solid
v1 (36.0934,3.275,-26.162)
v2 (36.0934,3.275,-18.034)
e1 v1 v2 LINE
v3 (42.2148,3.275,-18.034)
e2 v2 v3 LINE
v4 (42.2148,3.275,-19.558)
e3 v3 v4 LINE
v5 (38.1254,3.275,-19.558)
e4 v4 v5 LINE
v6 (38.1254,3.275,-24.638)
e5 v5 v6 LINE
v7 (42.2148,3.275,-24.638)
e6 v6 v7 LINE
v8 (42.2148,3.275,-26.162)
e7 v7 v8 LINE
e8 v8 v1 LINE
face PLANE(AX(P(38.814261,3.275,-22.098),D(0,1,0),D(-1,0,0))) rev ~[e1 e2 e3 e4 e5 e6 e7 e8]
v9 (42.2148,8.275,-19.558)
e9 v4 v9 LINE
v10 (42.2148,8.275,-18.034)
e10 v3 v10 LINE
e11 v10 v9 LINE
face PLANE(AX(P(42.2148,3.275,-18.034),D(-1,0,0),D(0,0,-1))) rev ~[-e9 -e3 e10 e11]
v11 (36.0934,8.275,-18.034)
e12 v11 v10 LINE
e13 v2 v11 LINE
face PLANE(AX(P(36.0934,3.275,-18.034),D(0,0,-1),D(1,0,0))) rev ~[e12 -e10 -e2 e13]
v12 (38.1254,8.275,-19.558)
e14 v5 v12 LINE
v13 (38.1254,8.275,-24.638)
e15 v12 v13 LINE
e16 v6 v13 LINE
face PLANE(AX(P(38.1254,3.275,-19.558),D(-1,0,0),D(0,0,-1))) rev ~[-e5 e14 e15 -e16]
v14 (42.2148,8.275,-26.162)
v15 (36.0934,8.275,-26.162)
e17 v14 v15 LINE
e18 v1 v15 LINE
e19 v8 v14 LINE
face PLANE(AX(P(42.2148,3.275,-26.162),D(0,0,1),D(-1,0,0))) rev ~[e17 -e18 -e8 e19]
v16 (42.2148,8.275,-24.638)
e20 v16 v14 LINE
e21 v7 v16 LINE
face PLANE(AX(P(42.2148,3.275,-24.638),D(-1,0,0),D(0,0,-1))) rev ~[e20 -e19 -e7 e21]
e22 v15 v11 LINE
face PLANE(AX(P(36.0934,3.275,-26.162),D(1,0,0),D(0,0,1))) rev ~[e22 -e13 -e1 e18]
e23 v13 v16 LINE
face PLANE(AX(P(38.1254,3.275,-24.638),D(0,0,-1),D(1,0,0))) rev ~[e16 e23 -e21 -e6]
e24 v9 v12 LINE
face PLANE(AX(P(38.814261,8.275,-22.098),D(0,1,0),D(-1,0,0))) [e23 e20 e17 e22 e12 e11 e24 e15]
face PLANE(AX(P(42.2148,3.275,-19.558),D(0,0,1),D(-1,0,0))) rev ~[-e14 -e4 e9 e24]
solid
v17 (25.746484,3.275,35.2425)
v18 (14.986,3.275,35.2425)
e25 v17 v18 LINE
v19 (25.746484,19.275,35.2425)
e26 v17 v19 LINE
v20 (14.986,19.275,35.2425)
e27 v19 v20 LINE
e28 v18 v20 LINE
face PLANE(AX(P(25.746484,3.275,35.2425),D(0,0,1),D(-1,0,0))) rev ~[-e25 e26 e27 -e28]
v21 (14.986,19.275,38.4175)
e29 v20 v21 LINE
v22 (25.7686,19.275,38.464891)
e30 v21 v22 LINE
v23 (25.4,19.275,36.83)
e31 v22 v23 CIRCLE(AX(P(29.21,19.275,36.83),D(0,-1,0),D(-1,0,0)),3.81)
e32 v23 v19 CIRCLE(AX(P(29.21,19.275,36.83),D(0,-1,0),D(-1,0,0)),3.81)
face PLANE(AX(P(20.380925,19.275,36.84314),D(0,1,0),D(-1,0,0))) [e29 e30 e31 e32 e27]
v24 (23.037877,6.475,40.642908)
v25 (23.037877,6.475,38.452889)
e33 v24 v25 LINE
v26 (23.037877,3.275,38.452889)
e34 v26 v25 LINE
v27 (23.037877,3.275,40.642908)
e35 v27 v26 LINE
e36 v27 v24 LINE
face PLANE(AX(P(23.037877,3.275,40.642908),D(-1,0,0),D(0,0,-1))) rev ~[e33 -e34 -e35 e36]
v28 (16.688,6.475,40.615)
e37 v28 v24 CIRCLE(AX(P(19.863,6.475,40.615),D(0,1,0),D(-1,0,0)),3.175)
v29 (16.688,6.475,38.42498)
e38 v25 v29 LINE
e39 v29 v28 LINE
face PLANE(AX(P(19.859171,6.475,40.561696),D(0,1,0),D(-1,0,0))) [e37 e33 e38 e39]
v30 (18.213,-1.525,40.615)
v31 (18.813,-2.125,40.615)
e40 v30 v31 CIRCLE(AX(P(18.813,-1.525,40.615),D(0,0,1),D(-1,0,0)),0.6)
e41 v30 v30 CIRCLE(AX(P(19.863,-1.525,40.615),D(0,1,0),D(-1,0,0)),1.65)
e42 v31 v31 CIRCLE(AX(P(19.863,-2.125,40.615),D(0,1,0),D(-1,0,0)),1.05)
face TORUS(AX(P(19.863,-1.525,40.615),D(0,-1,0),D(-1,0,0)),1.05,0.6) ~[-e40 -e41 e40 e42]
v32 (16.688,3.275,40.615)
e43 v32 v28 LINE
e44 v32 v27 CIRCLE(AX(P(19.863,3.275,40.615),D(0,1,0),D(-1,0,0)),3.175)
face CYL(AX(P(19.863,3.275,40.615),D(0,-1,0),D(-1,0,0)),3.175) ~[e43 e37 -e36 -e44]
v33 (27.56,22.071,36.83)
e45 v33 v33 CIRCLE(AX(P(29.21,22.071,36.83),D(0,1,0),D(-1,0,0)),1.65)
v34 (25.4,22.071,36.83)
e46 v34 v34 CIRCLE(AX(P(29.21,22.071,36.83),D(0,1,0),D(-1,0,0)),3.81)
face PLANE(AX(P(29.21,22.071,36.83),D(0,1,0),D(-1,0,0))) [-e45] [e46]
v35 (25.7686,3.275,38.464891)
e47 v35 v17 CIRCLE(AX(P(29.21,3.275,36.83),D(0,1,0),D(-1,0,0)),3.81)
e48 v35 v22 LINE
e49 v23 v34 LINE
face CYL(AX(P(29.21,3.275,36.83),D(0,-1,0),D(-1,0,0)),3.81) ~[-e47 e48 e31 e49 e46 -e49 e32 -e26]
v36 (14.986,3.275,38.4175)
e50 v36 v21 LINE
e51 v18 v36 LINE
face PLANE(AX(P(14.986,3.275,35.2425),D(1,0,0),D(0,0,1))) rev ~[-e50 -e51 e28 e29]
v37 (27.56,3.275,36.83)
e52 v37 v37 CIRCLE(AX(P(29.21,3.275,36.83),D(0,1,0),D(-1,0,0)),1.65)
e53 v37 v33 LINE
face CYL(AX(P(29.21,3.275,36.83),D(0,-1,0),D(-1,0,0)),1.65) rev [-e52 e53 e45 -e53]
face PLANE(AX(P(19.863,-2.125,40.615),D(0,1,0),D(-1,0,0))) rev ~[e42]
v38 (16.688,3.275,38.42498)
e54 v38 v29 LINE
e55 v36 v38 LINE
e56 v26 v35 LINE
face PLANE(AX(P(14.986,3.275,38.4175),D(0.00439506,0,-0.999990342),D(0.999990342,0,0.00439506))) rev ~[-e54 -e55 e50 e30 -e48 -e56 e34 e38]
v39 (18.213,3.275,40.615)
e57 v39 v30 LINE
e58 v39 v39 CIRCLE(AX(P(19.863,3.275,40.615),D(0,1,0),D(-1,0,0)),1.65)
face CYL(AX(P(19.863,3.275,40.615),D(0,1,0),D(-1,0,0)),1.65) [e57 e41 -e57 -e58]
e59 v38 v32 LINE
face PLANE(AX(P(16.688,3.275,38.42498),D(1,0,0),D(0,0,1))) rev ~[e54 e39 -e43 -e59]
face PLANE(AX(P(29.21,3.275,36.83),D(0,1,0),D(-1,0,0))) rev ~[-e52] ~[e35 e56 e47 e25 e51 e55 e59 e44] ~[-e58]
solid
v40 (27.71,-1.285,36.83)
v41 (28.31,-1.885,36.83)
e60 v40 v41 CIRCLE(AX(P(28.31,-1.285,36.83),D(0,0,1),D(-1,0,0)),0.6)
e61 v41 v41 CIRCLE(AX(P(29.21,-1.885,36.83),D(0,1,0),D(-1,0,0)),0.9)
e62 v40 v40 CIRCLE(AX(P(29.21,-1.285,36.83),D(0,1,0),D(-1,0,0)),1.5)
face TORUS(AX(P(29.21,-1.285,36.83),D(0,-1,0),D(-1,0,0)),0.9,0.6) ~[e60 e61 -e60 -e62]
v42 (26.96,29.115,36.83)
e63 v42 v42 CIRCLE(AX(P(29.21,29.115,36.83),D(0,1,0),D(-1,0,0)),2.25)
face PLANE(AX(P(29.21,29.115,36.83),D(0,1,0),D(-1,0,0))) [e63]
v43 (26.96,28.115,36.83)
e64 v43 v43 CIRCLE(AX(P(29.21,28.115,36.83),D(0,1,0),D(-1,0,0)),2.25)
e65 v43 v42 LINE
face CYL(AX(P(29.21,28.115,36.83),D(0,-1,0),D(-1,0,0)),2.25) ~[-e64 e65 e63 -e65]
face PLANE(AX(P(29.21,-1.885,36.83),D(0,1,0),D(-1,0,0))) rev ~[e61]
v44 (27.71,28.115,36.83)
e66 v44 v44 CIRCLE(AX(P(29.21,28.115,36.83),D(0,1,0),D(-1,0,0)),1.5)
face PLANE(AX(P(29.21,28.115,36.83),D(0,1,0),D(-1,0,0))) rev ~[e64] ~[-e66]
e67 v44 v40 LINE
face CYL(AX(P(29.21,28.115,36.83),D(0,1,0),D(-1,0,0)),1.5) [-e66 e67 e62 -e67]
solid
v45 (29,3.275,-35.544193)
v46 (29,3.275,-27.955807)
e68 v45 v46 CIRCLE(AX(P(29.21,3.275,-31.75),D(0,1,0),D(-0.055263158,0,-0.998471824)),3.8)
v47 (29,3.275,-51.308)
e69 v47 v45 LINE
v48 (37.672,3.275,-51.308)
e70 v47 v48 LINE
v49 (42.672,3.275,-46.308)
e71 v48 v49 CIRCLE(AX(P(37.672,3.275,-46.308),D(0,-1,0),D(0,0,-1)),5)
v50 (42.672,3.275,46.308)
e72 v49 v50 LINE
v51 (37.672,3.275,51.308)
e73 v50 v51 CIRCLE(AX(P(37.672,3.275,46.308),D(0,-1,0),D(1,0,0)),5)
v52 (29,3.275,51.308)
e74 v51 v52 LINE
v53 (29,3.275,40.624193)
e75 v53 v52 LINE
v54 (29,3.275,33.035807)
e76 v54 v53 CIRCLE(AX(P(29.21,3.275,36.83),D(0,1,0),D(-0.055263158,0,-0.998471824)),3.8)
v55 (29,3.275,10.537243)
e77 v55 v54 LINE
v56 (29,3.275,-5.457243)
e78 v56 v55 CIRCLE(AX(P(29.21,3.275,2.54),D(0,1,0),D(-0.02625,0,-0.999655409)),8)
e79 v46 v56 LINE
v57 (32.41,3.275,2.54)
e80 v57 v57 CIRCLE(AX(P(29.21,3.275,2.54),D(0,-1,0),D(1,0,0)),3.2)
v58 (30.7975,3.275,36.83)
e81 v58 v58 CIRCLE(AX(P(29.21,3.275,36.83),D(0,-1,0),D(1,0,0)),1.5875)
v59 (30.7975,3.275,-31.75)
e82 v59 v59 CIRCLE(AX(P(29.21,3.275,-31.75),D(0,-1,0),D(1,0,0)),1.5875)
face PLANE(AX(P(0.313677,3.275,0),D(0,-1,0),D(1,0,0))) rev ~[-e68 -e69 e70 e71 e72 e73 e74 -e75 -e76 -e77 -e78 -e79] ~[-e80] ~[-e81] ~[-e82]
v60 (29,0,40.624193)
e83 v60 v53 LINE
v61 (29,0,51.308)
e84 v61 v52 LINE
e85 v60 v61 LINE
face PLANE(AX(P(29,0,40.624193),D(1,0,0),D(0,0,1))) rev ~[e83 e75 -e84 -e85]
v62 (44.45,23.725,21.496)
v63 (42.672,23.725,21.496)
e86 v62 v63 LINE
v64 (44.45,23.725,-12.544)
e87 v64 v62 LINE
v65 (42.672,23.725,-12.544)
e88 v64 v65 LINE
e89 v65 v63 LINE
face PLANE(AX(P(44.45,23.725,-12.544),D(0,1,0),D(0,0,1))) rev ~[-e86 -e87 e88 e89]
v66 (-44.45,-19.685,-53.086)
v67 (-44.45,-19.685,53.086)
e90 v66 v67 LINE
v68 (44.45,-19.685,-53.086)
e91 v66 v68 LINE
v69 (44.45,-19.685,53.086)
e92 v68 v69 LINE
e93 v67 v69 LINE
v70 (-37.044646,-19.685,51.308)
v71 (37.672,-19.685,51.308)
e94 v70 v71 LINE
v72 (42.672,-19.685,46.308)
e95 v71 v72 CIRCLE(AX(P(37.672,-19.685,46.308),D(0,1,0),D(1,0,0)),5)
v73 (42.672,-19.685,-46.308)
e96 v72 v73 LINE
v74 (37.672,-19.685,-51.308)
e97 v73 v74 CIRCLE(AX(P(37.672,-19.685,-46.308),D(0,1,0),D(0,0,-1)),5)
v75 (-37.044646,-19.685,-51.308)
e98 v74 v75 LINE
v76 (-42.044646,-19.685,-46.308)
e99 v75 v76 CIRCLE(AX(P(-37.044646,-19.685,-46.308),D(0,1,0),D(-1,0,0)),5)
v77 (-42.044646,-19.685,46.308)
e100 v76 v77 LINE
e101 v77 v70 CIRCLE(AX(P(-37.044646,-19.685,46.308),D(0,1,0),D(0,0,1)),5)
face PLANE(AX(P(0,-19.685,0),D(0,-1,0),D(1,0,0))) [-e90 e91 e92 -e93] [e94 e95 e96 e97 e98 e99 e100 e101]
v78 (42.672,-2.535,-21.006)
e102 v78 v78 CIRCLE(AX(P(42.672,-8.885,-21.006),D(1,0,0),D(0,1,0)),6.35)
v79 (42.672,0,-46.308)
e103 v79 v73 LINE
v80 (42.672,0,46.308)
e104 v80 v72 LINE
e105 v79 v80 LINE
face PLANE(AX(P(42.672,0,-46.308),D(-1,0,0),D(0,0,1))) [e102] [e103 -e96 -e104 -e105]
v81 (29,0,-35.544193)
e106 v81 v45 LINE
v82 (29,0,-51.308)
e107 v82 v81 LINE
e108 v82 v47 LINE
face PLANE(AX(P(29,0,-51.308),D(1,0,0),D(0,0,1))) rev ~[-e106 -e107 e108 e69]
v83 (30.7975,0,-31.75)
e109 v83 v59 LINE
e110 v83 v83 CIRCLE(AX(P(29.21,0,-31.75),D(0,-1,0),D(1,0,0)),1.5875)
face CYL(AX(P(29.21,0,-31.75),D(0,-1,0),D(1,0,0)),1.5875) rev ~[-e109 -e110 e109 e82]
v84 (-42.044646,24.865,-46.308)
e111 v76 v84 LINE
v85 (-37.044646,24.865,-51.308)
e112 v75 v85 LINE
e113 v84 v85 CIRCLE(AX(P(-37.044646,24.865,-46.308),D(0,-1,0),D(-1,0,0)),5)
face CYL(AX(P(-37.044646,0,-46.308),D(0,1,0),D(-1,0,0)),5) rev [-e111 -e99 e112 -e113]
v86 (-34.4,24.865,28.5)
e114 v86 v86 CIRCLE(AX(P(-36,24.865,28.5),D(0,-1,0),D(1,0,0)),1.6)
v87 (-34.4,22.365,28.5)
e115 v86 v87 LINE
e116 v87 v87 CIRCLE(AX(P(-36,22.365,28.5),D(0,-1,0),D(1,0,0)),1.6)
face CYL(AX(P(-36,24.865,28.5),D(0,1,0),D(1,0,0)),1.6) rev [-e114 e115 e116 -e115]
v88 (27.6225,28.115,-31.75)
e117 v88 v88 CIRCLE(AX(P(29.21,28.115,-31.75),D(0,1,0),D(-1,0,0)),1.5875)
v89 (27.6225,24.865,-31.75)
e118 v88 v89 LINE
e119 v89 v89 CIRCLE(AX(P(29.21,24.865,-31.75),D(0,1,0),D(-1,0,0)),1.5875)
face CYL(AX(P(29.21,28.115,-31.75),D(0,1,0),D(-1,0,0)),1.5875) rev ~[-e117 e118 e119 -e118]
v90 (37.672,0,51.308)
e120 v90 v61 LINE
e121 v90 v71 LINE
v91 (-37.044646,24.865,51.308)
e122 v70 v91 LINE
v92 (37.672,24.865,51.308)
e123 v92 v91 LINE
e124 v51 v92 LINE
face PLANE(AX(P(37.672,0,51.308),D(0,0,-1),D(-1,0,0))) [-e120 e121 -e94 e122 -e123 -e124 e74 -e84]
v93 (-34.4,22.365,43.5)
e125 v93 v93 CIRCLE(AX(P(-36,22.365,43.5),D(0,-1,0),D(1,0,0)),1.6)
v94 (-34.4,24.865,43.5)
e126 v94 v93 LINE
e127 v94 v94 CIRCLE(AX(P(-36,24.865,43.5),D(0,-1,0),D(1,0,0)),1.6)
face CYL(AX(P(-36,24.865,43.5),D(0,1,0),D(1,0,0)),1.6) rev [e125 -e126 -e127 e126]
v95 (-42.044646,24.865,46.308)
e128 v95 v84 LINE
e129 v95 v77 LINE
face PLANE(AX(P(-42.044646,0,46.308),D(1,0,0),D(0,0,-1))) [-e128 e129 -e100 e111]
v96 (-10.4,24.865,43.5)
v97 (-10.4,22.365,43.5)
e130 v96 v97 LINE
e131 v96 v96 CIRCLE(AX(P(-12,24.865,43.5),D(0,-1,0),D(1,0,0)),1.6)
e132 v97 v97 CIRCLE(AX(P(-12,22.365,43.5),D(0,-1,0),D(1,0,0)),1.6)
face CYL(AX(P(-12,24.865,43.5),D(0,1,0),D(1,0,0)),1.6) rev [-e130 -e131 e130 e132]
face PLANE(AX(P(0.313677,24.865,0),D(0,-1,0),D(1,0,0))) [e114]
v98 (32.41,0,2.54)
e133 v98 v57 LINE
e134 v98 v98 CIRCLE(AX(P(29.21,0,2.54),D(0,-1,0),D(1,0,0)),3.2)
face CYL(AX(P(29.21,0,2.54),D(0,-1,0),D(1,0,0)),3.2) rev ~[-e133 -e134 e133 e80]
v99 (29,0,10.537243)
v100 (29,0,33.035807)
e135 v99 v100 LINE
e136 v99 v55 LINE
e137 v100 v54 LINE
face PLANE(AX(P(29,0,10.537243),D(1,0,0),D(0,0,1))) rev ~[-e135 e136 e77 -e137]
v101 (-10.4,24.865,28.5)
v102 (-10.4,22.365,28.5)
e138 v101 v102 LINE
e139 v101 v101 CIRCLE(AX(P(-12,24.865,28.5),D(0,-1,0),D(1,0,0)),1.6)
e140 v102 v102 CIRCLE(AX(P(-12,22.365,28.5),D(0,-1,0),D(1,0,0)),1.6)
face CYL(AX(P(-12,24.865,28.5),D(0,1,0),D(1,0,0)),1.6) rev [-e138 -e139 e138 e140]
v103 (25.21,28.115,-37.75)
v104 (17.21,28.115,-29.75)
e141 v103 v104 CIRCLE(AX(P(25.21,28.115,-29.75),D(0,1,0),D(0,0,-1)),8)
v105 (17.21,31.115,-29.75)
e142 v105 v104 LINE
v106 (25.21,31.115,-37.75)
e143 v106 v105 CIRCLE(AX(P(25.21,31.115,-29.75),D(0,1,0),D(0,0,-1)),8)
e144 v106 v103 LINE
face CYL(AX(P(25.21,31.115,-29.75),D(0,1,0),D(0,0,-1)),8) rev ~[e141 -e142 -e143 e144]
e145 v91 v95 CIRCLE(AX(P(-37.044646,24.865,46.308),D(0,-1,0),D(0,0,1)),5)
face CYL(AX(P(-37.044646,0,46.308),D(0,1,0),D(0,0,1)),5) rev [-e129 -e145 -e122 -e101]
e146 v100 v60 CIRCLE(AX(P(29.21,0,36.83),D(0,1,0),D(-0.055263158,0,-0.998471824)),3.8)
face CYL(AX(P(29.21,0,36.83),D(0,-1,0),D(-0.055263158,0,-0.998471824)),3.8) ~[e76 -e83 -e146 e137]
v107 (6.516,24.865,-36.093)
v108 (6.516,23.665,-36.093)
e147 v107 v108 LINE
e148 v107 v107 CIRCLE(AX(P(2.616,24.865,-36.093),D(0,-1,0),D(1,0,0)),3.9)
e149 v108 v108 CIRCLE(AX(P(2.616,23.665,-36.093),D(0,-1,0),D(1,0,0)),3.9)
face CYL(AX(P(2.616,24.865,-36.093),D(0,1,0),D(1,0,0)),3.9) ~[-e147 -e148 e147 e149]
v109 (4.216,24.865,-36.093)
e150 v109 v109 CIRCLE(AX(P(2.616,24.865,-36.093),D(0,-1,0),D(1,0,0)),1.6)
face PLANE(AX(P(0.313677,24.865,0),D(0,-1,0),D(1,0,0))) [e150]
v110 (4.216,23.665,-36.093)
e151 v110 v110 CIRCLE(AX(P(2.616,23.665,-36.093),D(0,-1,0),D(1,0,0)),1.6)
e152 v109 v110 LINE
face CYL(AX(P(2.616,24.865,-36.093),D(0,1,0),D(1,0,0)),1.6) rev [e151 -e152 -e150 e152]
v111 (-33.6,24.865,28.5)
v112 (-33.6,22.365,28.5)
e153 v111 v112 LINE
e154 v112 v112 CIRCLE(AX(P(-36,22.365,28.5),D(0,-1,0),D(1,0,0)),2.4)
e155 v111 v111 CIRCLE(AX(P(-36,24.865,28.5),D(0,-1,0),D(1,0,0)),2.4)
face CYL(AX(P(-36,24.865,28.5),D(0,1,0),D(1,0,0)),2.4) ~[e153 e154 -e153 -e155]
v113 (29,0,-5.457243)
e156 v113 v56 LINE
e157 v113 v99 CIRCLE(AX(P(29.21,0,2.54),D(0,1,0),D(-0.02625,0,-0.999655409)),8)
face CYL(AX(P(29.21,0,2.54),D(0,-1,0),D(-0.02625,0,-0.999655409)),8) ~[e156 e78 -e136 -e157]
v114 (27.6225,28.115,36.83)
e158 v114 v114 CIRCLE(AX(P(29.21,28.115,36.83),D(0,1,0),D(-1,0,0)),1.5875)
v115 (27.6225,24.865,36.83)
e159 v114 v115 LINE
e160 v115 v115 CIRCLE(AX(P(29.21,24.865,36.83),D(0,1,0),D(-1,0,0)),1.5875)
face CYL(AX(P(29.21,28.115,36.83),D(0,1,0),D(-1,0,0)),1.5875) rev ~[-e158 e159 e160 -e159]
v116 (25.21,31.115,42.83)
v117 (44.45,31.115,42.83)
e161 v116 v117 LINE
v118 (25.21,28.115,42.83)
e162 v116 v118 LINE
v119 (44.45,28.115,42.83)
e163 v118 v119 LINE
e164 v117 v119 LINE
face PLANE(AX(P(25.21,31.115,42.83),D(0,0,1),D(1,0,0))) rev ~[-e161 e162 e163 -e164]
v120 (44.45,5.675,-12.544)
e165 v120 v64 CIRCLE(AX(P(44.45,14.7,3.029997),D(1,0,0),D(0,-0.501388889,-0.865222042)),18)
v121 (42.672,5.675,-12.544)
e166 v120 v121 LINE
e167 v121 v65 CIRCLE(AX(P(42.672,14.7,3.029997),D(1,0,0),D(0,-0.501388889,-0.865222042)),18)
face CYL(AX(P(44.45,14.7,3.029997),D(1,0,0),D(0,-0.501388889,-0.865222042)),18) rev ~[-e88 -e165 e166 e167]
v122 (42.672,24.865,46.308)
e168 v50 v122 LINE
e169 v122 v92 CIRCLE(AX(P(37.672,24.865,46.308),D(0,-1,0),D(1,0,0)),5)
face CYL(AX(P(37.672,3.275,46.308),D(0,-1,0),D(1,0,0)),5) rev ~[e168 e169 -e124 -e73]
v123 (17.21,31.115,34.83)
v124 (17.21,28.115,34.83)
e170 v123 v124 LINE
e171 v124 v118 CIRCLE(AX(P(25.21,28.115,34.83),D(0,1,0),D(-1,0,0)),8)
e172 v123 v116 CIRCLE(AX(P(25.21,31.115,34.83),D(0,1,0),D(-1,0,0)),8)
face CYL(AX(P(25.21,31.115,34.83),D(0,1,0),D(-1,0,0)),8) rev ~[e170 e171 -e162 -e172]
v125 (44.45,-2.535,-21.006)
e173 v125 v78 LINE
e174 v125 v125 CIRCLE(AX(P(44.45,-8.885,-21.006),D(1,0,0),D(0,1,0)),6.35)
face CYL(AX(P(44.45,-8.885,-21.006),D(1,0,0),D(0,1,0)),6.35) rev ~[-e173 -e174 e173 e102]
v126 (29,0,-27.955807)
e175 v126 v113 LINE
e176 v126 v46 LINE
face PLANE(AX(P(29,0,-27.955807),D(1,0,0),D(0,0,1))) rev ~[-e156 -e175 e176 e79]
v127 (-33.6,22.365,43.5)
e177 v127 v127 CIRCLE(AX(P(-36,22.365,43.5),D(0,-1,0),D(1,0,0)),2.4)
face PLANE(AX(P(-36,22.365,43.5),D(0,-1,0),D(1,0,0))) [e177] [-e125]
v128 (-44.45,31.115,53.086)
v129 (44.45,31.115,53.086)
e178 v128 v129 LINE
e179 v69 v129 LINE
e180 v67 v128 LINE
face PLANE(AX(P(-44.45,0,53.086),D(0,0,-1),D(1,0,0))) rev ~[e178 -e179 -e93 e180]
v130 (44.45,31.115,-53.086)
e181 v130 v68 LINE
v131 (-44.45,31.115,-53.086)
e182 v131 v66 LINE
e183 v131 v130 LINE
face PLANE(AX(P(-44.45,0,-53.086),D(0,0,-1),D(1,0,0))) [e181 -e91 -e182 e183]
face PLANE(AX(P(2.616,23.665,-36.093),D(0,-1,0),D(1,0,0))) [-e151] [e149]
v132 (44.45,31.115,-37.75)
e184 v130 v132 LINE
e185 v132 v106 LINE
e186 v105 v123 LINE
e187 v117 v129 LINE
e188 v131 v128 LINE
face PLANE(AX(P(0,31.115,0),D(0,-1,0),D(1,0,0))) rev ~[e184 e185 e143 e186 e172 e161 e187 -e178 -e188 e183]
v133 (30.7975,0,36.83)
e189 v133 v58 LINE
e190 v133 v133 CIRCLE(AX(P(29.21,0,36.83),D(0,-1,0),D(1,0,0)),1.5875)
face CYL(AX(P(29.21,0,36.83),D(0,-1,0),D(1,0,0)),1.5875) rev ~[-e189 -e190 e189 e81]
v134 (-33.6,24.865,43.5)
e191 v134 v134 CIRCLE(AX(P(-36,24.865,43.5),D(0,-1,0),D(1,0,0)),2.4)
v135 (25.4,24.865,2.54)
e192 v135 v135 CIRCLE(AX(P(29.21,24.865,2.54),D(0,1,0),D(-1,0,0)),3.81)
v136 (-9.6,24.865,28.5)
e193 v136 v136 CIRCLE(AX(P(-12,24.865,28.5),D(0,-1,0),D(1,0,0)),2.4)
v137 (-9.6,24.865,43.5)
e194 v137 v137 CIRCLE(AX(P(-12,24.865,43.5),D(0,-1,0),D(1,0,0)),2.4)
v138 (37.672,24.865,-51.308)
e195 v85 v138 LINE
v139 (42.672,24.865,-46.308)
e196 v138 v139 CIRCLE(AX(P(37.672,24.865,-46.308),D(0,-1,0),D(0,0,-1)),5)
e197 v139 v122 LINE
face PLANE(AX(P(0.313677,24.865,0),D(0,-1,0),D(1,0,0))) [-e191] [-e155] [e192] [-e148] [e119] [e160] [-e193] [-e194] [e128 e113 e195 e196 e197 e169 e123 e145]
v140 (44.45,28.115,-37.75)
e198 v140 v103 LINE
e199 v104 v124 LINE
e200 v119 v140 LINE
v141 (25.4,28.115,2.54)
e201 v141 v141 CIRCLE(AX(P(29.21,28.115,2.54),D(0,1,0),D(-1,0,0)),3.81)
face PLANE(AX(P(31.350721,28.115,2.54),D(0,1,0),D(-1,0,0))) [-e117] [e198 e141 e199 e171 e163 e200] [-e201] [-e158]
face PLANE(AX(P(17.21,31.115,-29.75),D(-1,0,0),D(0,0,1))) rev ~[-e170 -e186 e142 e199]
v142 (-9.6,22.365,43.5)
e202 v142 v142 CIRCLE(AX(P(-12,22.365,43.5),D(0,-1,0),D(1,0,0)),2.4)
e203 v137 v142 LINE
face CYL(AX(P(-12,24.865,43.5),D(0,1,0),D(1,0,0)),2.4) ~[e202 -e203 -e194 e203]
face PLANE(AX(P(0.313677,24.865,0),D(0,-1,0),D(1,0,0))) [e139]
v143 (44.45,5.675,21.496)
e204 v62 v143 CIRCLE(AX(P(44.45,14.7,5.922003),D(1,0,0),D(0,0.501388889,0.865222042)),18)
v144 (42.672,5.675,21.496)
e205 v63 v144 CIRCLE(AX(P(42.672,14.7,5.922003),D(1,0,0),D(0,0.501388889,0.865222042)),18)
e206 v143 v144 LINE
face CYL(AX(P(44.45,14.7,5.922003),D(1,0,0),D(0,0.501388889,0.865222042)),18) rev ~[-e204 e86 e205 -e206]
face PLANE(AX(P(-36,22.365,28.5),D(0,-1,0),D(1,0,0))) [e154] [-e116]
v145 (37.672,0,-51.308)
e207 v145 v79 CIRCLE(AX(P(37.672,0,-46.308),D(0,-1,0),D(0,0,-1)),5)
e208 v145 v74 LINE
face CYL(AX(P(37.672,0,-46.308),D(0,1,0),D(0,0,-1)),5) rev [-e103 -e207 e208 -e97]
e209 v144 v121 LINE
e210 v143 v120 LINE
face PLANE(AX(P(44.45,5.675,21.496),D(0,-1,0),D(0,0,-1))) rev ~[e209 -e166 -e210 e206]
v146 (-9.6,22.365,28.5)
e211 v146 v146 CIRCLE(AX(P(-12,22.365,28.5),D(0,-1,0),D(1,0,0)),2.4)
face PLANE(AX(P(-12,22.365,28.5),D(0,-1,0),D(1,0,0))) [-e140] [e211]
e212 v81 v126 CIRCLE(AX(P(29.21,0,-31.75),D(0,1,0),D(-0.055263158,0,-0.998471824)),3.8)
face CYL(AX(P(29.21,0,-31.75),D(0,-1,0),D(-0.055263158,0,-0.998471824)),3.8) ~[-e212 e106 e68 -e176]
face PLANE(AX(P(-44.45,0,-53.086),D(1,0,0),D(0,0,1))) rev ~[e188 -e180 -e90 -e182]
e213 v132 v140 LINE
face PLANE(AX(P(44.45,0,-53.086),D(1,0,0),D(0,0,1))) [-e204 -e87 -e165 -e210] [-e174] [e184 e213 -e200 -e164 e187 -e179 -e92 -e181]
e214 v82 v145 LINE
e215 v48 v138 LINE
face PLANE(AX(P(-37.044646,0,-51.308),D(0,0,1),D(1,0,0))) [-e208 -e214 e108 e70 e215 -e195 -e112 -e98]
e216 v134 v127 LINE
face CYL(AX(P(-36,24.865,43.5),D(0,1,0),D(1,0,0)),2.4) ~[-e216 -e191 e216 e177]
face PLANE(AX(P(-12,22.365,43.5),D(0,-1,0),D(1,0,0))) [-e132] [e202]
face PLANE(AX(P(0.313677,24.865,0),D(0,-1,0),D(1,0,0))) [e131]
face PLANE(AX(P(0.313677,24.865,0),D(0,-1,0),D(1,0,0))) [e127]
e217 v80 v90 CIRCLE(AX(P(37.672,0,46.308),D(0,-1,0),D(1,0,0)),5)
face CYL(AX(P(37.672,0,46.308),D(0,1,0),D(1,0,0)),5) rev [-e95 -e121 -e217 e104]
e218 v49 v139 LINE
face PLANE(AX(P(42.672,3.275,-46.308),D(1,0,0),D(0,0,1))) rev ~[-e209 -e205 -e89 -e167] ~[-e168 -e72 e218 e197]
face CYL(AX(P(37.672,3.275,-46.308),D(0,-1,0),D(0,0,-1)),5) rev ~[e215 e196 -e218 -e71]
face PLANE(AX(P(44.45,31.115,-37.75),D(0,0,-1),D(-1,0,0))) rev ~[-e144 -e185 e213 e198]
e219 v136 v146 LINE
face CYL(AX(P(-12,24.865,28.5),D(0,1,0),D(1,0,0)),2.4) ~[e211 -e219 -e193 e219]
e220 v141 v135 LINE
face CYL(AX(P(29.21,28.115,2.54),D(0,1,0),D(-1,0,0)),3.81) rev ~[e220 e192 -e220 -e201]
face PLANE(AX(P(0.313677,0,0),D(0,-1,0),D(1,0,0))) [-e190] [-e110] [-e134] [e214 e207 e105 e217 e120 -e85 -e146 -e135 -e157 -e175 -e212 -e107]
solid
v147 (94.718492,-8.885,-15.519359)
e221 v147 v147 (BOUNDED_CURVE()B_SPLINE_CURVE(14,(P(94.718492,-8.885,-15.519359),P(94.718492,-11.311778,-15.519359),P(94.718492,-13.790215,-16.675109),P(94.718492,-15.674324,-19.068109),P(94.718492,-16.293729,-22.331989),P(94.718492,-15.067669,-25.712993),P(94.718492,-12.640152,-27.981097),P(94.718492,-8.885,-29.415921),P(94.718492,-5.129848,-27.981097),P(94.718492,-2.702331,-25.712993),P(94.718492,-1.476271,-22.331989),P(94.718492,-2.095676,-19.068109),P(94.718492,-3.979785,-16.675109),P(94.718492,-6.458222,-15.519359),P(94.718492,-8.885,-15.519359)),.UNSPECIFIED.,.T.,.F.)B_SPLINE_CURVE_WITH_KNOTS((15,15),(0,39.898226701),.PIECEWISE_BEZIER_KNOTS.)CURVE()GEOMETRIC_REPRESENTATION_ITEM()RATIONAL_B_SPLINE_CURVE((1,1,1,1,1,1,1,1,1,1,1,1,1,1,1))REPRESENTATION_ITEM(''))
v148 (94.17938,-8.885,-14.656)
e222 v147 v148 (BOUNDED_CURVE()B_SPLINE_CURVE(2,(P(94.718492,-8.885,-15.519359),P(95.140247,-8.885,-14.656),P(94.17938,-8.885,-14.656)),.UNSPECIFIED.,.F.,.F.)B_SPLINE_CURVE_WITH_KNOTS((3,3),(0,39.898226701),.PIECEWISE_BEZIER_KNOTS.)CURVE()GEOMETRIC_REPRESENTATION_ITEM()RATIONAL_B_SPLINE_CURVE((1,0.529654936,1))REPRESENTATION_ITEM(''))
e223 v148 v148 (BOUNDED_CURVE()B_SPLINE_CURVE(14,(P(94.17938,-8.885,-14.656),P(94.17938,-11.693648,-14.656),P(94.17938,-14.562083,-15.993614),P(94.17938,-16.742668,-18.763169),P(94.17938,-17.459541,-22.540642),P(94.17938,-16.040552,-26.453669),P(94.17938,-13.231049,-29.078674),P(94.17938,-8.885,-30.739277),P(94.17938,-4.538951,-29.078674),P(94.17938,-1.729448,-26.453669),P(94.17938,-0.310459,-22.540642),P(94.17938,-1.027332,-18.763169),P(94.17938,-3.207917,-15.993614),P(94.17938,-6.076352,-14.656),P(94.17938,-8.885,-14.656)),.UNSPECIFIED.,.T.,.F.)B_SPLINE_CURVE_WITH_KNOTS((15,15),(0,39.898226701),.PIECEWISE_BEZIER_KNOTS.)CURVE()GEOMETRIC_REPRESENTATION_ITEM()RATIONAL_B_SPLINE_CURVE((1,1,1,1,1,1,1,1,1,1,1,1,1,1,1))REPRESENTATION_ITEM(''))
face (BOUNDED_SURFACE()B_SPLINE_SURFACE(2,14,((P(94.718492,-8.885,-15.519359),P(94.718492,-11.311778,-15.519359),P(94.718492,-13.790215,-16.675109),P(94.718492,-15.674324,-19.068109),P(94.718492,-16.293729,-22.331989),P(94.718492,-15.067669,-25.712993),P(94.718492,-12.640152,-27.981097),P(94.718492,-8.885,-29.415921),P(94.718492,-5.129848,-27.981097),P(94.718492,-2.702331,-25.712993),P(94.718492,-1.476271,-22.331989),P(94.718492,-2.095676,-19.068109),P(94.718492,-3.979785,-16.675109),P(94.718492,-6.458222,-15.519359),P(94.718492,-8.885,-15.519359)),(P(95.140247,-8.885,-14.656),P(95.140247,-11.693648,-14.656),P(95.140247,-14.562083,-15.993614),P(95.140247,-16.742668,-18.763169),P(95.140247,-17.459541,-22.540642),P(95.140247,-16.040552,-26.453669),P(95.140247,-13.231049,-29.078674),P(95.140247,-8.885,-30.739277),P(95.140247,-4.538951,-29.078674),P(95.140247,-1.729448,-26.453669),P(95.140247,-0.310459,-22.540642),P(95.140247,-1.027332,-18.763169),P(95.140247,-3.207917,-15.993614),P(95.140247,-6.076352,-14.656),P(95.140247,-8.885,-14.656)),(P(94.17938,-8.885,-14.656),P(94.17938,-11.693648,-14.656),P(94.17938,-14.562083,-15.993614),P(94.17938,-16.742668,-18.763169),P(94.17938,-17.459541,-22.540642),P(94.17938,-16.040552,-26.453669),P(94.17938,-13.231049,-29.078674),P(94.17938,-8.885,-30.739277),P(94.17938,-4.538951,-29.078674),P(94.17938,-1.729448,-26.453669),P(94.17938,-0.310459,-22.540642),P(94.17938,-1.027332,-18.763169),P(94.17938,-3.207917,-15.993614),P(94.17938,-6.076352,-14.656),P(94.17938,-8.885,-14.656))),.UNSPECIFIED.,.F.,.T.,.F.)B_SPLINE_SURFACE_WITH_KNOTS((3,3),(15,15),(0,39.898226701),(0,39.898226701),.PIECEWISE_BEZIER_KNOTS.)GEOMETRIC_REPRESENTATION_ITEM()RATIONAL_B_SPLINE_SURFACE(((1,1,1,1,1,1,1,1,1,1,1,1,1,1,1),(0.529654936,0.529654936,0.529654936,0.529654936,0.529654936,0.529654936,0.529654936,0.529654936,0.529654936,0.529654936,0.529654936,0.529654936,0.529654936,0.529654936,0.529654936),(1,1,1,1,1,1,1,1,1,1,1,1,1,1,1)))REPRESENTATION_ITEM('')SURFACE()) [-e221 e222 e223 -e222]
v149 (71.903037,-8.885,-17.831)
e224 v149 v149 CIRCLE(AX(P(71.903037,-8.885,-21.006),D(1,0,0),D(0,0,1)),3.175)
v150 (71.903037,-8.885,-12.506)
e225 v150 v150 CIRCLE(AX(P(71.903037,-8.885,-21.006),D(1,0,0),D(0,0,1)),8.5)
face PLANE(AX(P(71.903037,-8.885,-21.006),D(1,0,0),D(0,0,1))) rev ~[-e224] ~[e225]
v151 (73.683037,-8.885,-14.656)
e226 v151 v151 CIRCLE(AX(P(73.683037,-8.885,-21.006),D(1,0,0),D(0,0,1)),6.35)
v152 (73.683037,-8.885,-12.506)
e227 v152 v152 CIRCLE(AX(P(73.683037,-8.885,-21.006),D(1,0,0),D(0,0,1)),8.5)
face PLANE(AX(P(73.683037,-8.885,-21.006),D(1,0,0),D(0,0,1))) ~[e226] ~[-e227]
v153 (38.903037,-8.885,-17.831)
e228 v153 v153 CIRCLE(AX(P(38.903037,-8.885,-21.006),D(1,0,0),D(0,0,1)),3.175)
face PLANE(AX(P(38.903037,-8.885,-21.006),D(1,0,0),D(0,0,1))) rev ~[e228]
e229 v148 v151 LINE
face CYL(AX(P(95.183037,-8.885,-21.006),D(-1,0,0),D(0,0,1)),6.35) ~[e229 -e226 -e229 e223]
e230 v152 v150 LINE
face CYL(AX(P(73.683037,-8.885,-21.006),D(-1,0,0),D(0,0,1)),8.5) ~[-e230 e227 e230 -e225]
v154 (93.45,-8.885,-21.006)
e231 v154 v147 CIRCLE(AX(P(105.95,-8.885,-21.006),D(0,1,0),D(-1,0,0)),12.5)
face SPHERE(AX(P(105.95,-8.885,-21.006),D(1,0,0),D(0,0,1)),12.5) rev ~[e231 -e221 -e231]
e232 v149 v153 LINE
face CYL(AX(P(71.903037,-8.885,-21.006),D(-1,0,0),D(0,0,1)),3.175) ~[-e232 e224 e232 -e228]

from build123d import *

# Parameters (mm, degrees)
F1_W      = 88.9
F1_H      = 106.172
F2_DEPTH  = 19.685
F3_W      = 88.9
F3_H      = 106.172
F4_DEPTH  = 31.115
F6_DEPTH  = 19.686
F8_R      = 6.35
F9_DEPTH  = 1.778
F12_DEPTH = 21.59
F13_R     = 1.5875
F13_R_2   = 3.2
F14_DEPTH = 3.275
F17_DEPTH = 2
F19_DEPTH = 3
F20_R     = 3.81
F20_R_2   = 1.5875
F21_DEPTH = 4
F24_R     = 0.6
F26_R     = 3.81
F26_R_2   = 1.65
F27_DEPTH = 18.796
F29_DEPTH = 16
F31_DEPTH = 3.2
F32_R     = 1.65
F33_DEPTH = 5.4
F34_R     = 0.6
F35_R     = 3.9
F35_R_2   = 1.6
F36_DEPTH = 1.2
F38_DEPTH = 5
F39_R     = 1.5
F40_DEPTH = 30
F41_R     = 0.6
F42_R     = 2.25
F43_DEPTH = 1
F44_R     = 2.4
F44_R_2   = 1.6
F45_DEPTH = 2.5


with BuildPart() as f2:
    # F1 (on Front) → F2 (new body)
    with BuildSketch(Plane.XZ):
        Rectangle(F1_W, F1_H)
    extrude(amount=F2_DEPTH)

    # F3 (on Front) → F4 (join)
    with BuildSketch(Plane.XZ):
        Rectangle(F3_W, F3_H)
    extrude(amount=-F4_DEPTH)

    # F5 (on Front) → F6 (cut, through all)
    with BuildSketch(Plane.XZ):
        with BuildLine():
            ThreePointArc((-37.044646, 51.308), (-40.5801799059, 49.8435339059), (-42.044646, 46.308))
            Line((-42.044646, 46.308), (-42.044646, -46.308))
            ThreePointArc((-42.044646, -46.308), (-40.5801799059, -49.8435339059), (-37.044646, -51.308))
            Line((-37.044646, -51.308), (37.672, -51.308))
            ThreePointArc((37.672, -51.308), (41.2075339059, -49.8435339059), (42.672, -46.308))
            Line((42.672, -46.308), (42.672, 46.308))
            ThreePointArc((42.672, 46.308), (41.2075339059, 49.8435339059), (37.672, 51.308))
            Line((37.672, 51.308), (-37.044646, 51.308))
        make_face()
    extrude(amount=F6_DEPTH, mode=Mode.SUBTRACT)

    # F8 (on face) → F9 (cut, through all)
    with BuildSketch(Plane.YZ.offset(44.45)):
        with Locations((-8.885, -21.006)):
            Circle(F8_R)
    extrude(amount=-F9_DEPTH, mode=Mode.SUBTRACT)

    # F11 (on offset) → F12 (cut)
    with BuildSketch(Plane.XZ.offset(-3.275)):
        with BuildLine():
            Line((37.672, 51.308), (-37.044646, 51.308))
            ThreePointArc((-37.044646, 51.308), (-40.5801799059, 49.8435339059), (-42.044646, 46.308))
            Line((-42.044646, 46.308), (-42.044646, -46.308))
            ThreePointArc((-42.044646, -46.308), (-40.5801799059, -49.8435339059), (-37.044646, -51.308))
            Line((-37.044646, -51.308), (37.672, -51.308))
            ThreePointArc((37.672, -51.308), (41.2075339059, -49.8435339059), (42.672, -46.308))
            Line((42.672, -46.308), (42.672, 46.308))
            ThreePointArc((42.672, 46.308), (41.2075339059, 49.8435339059), (37.672, 51.308))
        make_face()
    extrude(amount=-F12_DEPTH, mode=Mode.SUBTRACT)

    # F13 (on face) → F14 (cut, through all)
    with BuildSketch(Plane.XZ):
        with BuildLine():
            Line((29, 40.6241929313), (29, 51.308))
            Line((29, 51.308), (-37.044646, 51.308))
            ThreePointArc((-37.044646, 51.308), (-40.5801799059, 49.8435339059), (-42.044646, 46.308))
            Line((-42.044646, 46.308), (-42.044646, -46.308))
            ThreePointArc((-42.044646, -46.308), (-40.5801799059, -49.8435339059), (-37.044646, -51.308))
            Line((-37.044646, -51.308), (29, -51.308))
            Line((29, -51.308), (29, -35.5441929313))
            ThreePointArc((29, -35.5441929313), (25.41, -31.75), (29, -27.9558070687))
            Line((29, -27.9558070687), (29, -5.457243275))
            ThreePointArc((29, -5.457243275), (21.21, 2.54), (29, 10.537243275))
            Line((29, 10.537243275), (29, 33.0358070687))
            ThreePointArc((29, 33.0358070687), (25.41, 36.83), (29, 40.6241929313))
        make_face()
        with Locations((29.21, -31.75)):
            Circle(F13_R)
        with Locations((29.21, 36.83)):
            Circle(F13_R)
        with Locations((29.21, 2.54)):
            Circle(F13_R_2)
    extrude(amount=-F14_DEPTH, mode=Mode.SUBTRACT)

    # F16 (on face) → F17 (cut)
    with BuildSketch(Plane.YZ.offset(44.45)):
        with BuildLine():
            ThreePointArc((5.675, -12.544), (14.7, -14.9700032426), (23.725, -12.544))
            Line((23.725, -12.544), (23.725, 21.496))
            ThreePointArc((23.725, 21.496), (14.7, 23.9220032426), (5.675, 21.496))
            Line((5.675, 21.496), (5.675, -12.544))
        make_face()
    extrude(amount=-F17_DEPTH, mode=Mode.SUBTRACT)

    # F18 (on face) → F19 (cut)
    with BuildSketch(Plane(origin=(0, 31.115, 0), x_dir=(-1, 0, 0), z_dir=(0, 1, 0))):
        with BuildLine():
            Line((-25.21, 42.83), (-44.45, 42.83))
            Line((-44.45, 42.83), (-44.45, -37.75))
            Line((-44.45, -37.75), (-25.21, -37.75))
            ThreePointArc((-25.21, -37.75), (-19.5531457505, -35.4068542495), (-17.21, -29.75))
            Line((-17.21, -29.75), (-17.21, 34.83))
            ThreePointArc((-17.21, 34.83), (-19.5531457505, 40.4868542495), (-25.21, 42.83))
        make_face()
    extrude(amount=-F19_DEPTH, mode=Mode.SUBTRACT)

    # F20 (on face) → F21 (cut)
    with BuildSketch(Plane(origin=(0, 28.115, 0), x_dir=(-1, 0, 0), z_dir=(0, 1, 0))):
        with Locations((-29.21, 2.54)):
            Circle(F20_R)
        with Locations((-29.21, 36.83)):
            Circle(F20_R_2)
        with Locations((-29.21, -31.75)):
            Circle(F20_R_2)
    extrude(amount=-F21_DEPTH, mode=Mode.SUBTRACT)

    # F35 (on face) → F36 (join)
    with BuildSketch(Plane.XZ.offset(-24.865)):
        with Locations((2.616, -36.093)):
            Circle(F35_R)
        with Locations((2.616, -36.093)):
            Circle(F35_R_2, mode=Mode.SUBTRACT)
    extrude(amount=F36_DEPTH)

    # F44 (on face) → F45 (join)
    with BuildSketch(Plane.XZ.offset(-24.865)):
        with Locations((-36, 43.5)):
            Circle(F44_R)
        with Locations((-36, 43.5)):
            Circle(F44_R_2, mode=Mode.SUBTRACT)
        with Locations((-36, 28.5)):
            Circle(F44_R)
        with Locations((-36, 28.5)):
            Circle(F44_R_2, mode=Mode.SUBTRACT)
        with Locations((-12, 43.5)):
            Circle(F44_R)
        with Locations((-12, 43.5)):
            Circle(F44_R_2, mode=Mode.SUBTRACT)
        with Locations((-12, 28.5)):
            Circle(F44_R)
        with Locations((-12, 28.5)):
            Circle(F44_R_2, mode=Mode.SUBTRACT)
    extrude(amount=F45_DEPTH)


with BuildPart() as f23:
    # F22 (on offset) → F23 (revolve)
    with BuildSketch(Plane.XZ.offset(8.885)):
        with BuildLine():
            Line((38.9030366398, -17.831), (38.9030366398, -21.006))
            Line((38.9030366398, -21.006), (93.45, -21.006))
            ThreePointArc((93.45, -21.006), (93.8910398043, -17.7148787627), (95.1830366398, -14.656))
            Line((95.1830366398, -14.656), (73.6830366398, -14.656))
            Line((73.6830366398, -14.656), (73.6830366398, -12.506))
            Line((73.6830366398, -12.506), (71.9030366398, -12.506))
            Line((71.9030366398, -12.506), (71.9030366398, -17.831))
            Line((71.9030366398, -17.831), (38.9030366398, -17.831))
        make_face()
    revolve(axis=Axis((38.9030366398, -8.885, -21.006), (1, 0, 0)))

    # F24
    f24_edges = [f23.edges().sort_by_distance(p)[0] for p in [
        (95.183037, -8.885, -27.356),
        (93.89104, -8.885, -17.714879),
    ]]
    fillet(f24_edges, radius=F24_R)


with BuildPart() as f27:
    # F26 (on face) → F27 (new body)
    with BuildSketch(Plane(origin=(0, 3.275, 0), x_dir=(-1, 0, 0), z_dir=(0, 1, 0))):
        with Locations((-29.21, 36.83)):
            Circle(F26_R)
        with Locations((-29.21, 36.83)):
            Circle(F26_R_2, mode=Mode.SUBTRACT)
    extrude(amount=F27_DEPTH)

    # F28 (on face) → F29 (join)
    with BuildSketch(Plane(origin=(0, 3.275, 0), x_dir=(-1, 0, 0), z_dir=(0, 1, 0))):
        Polygon((-25.7686001944, 38.4648906319), (-25.7464839036, 35.2425), (-14.986, 35.2425), (-14.986, 38.4175), align=None)
    extrude(amount=F29_DEPTH)

    # F30 (on face) → F31 (join)
    with BuildSketch(Plane(origin=(0, 3.275, 0), x_dir=(-1, 0, 0), z_dir=(0, 1, 0))):
        with BuildLine():
            Line((-16.688, 38.4249804643), (-16.688, 40.615))
            ThreePointArc((-16.688, 40.615), (-19.8490456847, 43.7899693348), (-23.0378773399, 40.6429083611))
            Line((-23.0378773399, 40.6429083611), (-23.0378773399, 38.4528888253))
            Line((-23.0378773399, 38.4528888253), (-16.688, 38.4249804643))
        make_face()
    extrude(amount=F31_DEPTH)

    # F32 (on face) → F33 (join)
    with BuildSketch(Plane(origin=(0, 3.275, 0), x_dir=(-1, 0, 0), z_dir=(0, 1, 0))):
        with Locations((-19.863, 40.615)):
            Circle(F32_R)
    extrude(amount=-F33_DEPTH)

    # F34
    f34_edges = [f27.edges().sort_by_distance(p)[0] for p in [
        (21.513, -2.125, 40.615),
    ]]
    fillet(f34_edges, radius=F34_R)


with BuildPart() as f38:
    # F37 (on face) → F38 (new body)
    with BuildSketch(Plane(origin=(0, 3.275, 0), x_dir=(-1, 0, 0), z_dir=(0, 1, 0))):
        Polygon((-42.2148, -24.638), (-42.2148, -26.162), (-36.0934, -26.162), (-36.0934, -18.034), (-42.2148, -18.034), (-42.2148, -19.558), (-38.1254, -19.558), (-38.1254, -24.638), align=None)
    extrude(amount=F38_DEPTH)


with BuildPart() as f40:
    # F39 (on face) → F40 (new body)
    with BuildSketch(Plane(origin=(0, 28.115, 0), x_dir=(-1, 0, 0), z_dir=(0, 1, 0))):
        with Locations((-29.21, 36.83)):
            Circle(F39_R)
    extrude(amount=-F40_DEPTH)

    # F41
    f41_edges = [f40.edges().sort_by_distance(p)[0] for p in [
        (30.71, -1.885, 36.83),
    ]]
    fillet(f41_edges, radius=F41_R)

    # F42 (on face) → F43 (join)
    with BuildSketch(Plane(origin=(0, 28.115, 0), x_dir=(-1, 0, 0), z_dir=(0, 1, 0))):
        with Locations((-29.21, 36.83)):
            Circle(F42_R)
    extrude(amount=F43_DEPTH)


solid = Compound([f2.part, f23.part, f27.part, f38.part, f40.part])
